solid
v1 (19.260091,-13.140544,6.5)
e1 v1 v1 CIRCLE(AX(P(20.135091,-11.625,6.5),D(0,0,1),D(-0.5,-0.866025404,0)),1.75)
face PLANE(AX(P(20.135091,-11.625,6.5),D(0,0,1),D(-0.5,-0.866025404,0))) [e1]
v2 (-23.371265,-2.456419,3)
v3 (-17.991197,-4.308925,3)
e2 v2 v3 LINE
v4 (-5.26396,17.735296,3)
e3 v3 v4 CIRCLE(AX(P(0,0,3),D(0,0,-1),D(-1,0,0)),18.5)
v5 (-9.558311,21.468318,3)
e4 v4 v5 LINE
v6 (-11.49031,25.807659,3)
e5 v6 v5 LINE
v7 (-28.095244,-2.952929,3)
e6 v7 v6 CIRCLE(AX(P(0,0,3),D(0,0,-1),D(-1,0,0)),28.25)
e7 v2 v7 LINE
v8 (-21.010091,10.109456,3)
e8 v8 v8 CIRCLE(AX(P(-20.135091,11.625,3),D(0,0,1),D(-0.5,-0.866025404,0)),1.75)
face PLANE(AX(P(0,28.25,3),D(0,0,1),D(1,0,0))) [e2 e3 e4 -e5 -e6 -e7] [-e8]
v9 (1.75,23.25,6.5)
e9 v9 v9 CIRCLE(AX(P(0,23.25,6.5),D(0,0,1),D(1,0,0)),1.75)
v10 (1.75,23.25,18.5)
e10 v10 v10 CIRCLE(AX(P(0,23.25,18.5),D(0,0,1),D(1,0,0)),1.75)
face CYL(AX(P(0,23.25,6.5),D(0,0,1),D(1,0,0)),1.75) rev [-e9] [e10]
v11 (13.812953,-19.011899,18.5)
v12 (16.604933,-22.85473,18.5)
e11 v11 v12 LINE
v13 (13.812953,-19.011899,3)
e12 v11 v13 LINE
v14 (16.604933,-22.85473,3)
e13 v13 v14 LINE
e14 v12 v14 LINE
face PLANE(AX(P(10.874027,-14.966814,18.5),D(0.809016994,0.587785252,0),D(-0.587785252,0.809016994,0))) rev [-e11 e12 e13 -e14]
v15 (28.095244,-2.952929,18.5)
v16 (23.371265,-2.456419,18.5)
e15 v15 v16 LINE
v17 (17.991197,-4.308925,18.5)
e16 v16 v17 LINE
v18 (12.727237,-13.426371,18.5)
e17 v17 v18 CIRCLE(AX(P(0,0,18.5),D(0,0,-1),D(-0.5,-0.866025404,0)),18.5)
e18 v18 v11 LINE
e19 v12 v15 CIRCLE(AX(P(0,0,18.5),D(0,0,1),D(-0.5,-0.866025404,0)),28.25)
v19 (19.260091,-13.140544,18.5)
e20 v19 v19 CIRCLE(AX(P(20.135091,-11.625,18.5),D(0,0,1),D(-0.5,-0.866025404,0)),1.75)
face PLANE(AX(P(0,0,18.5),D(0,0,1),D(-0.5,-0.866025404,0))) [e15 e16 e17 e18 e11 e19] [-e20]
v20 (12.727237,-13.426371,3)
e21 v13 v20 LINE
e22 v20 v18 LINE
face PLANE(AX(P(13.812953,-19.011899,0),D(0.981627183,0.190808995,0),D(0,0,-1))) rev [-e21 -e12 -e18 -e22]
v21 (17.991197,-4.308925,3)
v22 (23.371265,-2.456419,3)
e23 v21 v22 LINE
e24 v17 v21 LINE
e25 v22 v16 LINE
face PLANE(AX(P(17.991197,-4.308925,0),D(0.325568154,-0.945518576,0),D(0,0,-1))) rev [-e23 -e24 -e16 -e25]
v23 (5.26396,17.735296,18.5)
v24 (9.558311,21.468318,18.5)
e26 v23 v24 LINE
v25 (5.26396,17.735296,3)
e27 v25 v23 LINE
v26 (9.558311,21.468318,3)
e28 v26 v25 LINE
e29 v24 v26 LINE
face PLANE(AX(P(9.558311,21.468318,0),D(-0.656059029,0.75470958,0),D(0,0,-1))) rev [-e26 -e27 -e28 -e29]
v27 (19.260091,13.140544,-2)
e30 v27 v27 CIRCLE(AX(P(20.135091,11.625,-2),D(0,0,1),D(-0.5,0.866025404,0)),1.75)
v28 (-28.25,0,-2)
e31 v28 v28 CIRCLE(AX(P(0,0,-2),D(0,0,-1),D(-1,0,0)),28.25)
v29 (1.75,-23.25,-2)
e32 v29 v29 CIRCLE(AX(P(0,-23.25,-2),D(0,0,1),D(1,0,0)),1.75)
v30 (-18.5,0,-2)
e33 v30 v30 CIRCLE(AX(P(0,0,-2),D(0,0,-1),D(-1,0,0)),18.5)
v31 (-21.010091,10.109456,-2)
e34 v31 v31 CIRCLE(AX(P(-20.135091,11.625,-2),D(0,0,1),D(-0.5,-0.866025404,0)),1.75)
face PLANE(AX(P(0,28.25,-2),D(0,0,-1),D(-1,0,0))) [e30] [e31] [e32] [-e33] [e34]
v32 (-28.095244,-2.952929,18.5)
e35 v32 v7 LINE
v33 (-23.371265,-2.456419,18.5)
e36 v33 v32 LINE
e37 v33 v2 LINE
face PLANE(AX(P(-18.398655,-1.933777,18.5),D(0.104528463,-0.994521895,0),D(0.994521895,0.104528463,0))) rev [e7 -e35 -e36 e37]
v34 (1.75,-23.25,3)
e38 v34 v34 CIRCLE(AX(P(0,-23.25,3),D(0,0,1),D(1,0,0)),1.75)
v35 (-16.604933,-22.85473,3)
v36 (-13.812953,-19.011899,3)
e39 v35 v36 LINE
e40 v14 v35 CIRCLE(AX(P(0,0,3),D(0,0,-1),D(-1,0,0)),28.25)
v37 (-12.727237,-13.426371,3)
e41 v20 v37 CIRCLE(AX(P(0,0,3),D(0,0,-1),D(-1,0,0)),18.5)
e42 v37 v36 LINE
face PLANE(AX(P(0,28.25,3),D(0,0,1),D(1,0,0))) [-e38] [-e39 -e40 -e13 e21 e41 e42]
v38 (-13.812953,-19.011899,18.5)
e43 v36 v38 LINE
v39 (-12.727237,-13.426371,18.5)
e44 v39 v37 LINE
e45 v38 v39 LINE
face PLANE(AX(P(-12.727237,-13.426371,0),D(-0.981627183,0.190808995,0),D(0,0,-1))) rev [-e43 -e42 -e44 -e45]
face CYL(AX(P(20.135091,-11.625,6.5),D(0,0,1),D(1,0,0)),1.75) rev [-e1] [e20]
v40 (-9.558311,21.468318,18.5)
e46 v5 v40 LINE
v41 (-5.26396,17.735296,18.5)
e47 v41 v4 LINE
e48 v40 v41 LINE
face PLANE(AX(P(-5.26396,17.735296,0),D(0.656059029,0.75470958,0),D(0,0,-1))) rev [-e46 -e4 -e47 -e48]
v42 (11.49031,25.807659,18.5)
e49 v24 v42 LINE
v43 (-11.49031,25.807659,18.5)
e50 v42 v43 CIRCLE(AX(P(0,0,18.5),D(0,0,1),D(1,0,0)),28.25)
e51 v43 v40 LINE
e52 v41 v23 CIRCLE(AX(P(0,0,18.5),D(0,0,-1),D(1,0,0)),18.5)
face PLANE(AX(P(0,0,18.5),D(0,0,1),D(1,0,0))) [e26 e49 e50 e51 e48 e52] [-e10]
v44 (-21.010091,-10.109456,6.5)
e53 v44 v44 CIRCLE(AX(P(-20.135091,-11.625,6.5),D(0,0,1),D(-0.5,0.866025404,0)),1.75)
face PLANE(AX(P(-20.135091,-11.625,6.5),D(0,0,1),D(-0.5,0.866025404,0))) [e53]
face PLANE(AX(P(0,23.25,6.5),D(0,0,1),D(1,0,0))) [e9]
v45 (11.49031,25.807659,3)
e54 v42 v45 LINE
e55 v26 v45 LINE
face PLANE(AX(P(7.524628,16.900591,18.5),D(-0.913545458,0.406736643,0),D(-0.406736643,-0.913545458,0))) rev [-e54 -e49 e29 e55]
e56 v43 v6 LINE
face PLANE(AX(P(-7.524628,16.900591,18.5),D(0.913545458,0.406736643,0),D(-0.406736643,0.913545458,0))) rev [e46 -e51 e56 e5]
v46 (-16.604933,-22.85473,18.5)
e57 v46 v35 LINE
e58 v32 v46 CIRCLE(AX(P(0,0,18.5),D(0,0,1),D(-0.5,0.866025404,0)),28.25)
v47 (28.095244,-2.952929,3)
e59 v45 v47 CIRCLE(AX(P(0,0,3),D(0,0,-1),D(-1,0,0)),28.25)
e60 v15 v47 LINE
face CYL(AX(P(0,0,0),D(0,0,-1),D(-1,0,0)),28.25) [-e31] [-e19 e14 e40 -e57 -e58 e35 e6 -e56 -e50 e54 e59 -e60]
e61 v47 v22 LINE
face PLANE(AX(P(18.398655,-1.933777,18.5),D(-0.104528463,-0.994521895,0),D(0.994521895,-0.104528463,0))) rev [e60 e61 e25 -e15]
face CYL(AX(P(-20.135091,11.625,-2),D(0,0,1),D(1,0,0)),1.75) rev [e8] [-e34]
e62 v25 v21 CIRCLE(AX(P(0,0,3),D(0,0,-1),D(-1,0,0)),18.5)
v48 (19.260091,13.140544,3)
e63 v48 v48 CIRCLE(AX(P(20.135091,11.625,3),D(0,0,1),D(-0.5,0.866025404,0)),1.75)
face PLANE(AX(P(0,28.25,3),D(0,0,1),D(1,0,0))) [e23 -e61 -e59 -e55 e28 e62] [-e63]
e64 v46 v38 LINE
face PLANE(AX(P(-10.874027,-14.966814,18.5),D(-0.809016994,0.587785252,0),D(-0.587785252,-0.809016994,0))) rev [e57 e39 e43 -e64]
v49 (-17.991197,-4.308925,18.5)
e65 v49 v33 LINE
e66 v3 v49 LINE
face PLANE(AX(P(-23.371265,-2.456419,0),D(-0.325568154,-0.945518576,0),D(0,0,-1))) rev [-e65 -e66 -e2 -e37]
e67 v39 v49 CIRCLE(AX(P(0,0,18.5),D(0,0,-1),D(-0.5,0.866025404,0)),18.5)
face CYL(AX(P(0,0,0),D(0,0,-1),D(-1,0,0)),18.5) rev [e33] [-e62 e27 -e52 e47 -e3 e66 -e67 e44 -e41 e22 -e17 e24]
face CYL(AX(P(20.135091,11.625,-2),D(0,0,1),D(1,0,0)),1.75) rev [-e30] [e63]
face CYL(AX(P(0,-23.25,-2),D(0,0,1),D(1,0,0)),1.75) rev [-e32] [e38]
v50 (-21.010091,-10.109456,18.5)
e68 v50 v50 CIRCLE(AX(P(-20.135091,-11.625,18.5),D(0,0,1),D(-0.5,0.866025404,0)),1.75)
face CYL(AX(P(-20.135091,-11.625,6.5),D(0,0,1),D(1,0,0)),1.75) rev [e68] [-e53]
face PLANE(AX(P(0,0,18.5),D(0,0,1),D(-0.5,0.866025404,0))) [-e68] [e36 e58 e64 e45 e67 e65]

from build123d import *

# Parameters (mm, degrees)
BOSS_EXTRUDE1_DEPTH = 15.5
CHAMFER1_START      = 3
CHAMFER1_DEPTH      = 16
CIRPATTERN1_COUNT   = 3
SKETCH4_R           = 1.75
CUT_EXTRUDE1_DEPTH  = 12
CIRPATTERN2_COUNT   = 3
SKETCH5_R           = 1.75
CUT_EXTRUDE2_DEPTH  = 43.852946223
CIRPATTERN3_COUNT   = 3


with BuildPart() as part:
    # Sketch2 → Revolve1 (revolve)
    with BuildSketch(Plane(origin=(0, 0, 0), x_dir=(0, 0, -1), z_dir=(1, 0, 0)), mode=Mode.PRIVATE) as revolve1_sk:
        Polygon((0, 28.25), (-3, 28.25), (-3, 18.5), (0, 18.5), (2, 18.5), (2, 28.25), align=None)
    revolve(revolve1_sk.sketch.rotate(Axis((0, 0, 0), (0, 0, 1)), 90), axis=Axis((0, 0, 0), (0, 0, 1)))

    # Sketch3 → Boss-Extrude1 (add)
    with BuildSketch(Plane.XY.offset(3)):
        with BuildLine():
            Line((-7.524627897, 16.900590966), (-11.490310167, 25.807659178))
            ThreePointArc((-11.490310167, 25.807659178), (0, 28.25), (11.490310167, 25.807659178))
            Line((11.490310167, 25.807659178), (7.524627897, 16.900590966))
            ThreePointArc((7.524627897, 16.900590966), (0, 18.5), (-7.524627897, 16.900590966))
        make_face()
    boss_extrude1 = extrude(amount=BOSS_EXTRUDE1_DEPTH)

    # Chamfer1: read off the stored shape, not the designer's step
    # Chamfer1 outline → Chamfer1 (cut)
    with BuildSketch(Plane.XY.offset(CHAMFER1_START)):
        with BuildLine():
            Line((7.524627897, 16.900590966), (9.558311113, 21.468318255))
            Line((9.558311113, 21.468318255), (5.263960206, 17.735295964))
            ThreePointArc((5.263960206, 17.735295964), (6.407899775, 17.354792435), (7.524627897, 16.900590966))
        make_face()
        with BuildLine():
            ThreePointArc((-7.524627897, 16.900590966), (-6.407899775, 17.354792435), (-5.263960206, 17.735295964))
            Line((-5.263960206, 17.735295964), (-9.558311112, 21.468318255))
            Line((-9.558311112, 21.468318255), (-7.524627897, 16.900590966))
        make_face()
    chamfer1 = extrude(amount=CHAMFER1_DEPTH, mode=Mode.SUBTRACT)

    # CirPattern1: Boss-Extrude1, Chamfer1 ×3 about axis
    cirpattern1_axis = Axis((0, 0, 0), (0, 0, 1))
    add([boss_extrude1.rotate(cirpattern1_axis, i * 360 / CIRPATTERN1_COUNT) for i in range(1, CIRPATTERN1_COUNT)])
    add([chamfer1.rotate(cirpattern1_axis, i * 360 / CIRPATTERN1_COUNT) for i in range(1, CIRPATTERN1_COUNT)], mode=Mode.SUBTRACT)

    # Sketch4 → Cut-Extrude1 (cut)
    with BuildSketch(Plane.XY.offset(18.5)):
        with Locations((0, 23.25)):
            Circle(SKETCH4_R)
    cut_extrude1 = extrude(amount=-CUT_EXTRUDE1_DEPTH, mode=Mode.SUBTRACT)

    # CirPattern2: Cut-Extrude1 ×3 about axis
    cirpattern2_axis = Axis((0, 0, 0), (0, 0, 1))
    for i in range(1, CIRPATTERN2_COUNT):
        add(cut_extrude1.rotate(cirpattern2_axis, i * 360 / CIRPATTERN2_COUNT), mode=Mode.SUBTRACT)

    # Sketch5 → Cut-Extrude2 (cut, through all)
    with BuildSketch(Plane.XY.offset(3)):
        with Locations((0, -23.25)):
            Circle(SKETCH5_R)
    cut_extrude2 = extrude(amount=-CUT_EXTRUDE2_DEPTH, mode=Mode.SUBTRACT)

    # CirPattern3: Cut-Extrude2 ×3 about axis
    cirpattern3_axis = Axis((0, 0, 0), (0, 0, 1))
    for i in range(1, CIRPATTERN3_COUNT):
        add(cut_extrude2.rotate(cirpattern3_axis, i * 360 / CIRPATTERN3_COUNT), mode=Mode.SUBTRACT)


solid = part.part
